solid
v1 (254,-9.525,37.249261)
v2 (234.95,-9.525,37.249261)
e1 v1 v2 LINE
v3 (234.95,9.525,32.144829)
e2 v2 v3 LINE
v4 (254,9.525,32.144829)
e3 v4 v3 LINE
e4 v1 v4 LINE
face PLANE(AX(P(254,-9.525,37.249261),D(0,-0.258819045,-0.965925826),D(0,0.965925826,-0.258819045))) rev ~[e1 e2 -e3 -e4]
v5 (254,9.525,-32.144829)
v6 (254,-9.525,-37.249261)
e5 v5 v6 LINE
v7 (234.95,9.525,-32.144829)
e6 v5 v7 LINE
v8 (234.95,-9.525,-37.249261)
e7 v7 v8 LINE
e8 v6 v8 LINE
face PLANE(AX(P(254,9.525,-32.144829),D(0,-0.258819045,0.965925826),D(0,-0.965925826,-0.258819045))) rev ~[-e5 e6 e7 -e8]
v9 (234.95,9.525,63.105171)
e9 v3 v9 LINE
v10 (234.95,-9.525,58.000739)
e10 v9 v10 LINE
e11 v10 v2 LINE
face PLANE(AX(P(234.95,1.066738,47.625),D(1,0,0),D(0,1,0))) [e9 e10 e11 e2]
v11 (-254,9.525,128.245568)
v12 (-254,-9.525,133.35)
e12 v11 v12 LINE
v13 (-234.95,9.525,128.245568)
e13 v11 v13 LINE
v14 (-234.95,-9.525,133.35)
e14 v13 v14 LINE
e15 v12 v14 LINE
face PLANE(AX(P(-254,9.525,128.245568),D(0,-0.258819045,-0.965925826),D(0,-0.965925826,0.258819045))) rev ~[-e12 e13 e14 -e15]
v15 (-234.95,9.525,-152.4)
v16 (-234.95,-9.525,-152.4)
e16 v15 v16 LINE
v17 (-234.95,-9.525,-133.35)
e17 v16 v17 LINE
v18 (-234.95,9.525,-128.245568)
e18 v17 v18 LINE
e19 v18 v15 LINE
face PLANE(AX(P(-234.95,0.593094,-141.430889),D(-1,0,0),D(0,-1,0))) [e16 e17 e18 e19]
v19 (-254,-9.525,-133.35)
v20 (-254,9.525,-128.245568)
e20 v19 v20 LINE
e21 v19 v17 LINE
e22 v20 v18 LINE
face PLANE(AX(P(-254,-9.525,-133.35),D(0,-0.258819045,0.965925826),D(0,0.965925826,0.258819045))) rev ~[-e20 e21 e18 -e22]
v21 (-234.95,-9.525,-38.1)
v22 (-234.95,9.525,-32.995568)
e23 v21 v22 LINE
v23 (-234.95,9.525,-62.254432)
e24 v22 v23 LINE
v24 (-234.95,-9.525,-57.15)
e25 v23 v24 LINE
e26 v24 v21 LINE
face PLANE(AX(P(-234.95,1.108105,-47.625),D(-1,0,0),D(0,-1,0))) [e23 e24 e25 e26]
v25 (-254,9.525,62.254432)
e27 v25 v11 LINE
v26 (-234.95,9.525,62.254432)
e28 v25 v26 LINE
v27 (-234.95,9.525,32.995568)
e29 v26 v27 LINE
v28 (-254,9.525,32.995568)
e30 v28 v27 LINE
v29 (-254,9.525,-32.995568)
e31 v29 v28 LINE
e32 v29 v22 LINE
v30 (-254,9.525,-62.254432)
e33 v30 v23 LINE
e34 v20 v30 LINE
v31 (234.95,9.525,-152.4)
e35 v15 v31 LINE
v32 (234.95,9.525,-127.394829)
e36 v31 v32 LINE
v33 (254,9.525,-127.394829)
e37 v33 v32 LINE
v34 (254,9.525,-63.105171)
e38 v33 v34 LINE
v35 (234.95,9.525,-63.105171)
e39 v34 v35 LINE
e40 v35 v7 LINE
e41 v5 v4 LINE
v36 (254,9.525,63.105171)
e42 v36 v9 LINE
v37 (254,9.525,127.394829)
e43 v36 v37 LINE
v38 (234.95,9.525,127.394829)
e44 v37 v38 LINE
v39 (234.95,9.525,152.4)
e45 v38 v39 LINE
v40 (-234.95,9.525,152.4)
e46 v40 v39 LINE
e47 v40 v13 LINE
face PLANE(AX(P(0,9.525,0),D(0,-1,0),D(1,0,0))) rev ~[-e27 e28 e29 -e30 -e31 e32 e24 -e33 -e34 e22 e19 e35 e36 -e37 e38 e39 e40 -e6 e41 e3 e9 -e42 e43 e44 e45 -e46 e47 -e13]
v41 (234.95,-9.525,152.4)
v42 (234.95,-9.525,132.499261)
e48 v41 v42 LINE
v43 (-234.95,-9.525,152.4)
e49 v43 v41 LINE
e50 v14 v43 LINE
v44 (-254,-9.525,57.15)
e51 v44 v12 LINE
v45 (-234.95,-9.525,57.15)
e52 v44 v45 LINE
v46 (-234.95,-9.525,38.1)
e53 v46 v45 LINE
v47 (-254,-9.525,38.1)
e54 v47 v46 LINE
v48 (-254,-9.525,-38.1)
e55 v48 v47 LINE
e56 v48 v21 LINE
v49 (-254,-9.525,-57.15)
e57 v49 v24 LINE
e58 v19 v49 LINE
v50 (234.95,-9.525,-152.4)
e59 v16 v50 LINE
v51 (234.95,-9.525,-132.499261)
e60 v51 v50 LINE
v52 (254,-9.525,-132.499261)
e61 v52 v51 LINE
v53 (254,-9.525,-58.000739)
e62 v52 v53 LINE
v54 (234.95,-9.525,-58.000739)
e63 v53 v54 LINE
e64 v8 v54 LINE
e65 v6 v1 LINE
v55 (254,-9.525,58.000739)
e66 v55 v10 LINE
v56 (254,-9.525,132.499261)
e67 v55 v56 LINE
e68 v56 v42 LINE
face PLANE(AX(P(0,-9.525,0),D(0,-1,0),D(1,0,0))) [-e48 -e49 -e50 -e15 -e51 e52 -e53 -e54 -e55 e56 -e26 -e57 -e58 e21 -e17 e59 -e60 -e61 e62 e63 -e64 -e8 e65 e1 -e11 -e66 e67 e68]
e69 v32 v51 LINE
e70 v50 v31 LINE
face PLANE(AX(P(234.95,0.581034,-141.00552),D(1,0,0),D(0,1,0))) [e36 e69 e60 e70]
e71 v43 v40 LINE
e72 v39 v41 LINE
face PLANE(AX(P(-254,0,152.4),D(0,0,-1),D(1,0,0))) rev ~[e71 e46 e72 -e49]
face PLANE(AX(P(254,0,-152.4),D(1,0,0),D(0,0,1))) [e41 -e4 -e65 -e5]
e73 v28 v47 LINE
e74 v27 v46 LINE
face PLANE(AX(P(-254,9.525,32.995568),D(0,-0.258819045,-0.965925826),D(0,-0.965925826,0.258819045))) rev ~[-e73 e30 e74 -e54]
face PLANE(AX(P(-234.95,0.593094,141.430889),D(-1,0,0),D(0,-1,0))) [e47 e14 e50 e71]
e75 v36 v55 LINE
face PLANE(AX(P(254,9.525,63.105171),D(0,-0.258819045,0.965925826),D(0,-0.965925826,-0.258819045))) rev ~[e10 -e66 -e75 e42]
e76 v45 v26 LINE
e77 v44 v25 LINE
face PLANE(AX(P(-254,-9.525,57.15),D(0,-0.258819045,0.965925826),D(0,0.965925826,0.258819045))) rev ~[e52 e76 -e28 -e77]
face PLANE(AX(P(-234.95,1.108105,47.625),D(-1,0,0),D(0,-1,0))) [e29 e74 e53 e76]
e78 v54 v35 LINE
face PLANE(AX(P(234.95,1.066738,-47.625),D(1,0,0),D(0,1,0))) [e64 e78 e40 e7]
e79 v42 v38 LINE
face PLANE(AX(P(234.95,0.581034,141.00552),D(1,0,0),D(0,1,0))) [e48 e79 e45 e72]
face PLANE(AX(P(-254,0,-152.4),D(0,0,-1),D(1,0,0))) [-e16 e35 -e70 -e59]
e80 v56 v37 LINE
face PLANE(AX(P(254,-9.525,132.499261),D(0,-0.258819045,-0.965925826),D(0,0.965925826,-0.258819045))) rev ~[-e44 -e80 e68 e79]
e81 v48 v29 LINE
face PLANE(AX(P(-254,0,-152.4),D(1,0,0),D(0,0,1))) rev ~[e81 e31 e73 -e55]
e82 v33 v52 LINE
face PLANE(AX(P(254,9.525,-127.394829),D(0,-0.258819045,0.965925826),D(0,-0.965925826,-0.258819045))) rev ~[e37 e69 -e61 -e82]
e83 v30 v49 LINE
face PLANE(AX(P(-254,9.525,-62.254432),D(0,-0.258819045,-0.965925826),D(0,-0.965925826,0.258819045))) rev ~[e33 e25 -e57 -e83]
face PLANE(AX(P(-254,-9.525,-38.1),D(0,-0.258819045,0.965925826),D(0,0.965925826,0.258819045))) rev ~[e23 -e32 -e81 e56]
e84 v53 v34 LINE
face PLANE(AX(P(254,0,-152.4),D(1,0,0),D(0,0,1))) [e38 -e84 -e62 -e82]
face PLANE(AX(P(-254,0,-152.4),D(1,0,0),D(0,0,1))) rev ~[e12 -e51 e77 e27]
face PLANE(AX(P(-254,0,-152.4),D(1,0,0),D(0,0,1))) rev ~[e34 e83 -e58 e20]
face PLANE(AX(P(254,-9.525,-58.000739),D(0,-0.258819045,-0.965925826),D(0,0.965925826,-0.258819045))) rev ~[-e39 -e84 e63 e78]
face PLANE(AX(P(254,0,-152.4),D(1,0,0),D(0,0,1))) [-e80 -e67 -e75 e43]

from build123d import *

# Parameters (mm, degrees)
F0_W     = 508
F0_H     = 304.8
F1_DEPTH = 9.525
F3_DEPTH = 19.05
F5_DEPTH = 19.05


# Not quite as in the source:
# - a feature names something its author has since deleted; it is built from what else it names


with BuildPart() as f1:
    # F0 (on Front) → F1 (new body, symmetric)
    with BuildSketch(Plane.XZ):
        Rectangle(F0_W, F0_H)
    extrude(amount=F1_DEPTH, both=True)

    # F2 (on face) → F3 (cut)
    with BuildSketch(Plane(origin=(-254, 0, 0), x_dir=(0, -1, 0), z_dir=(-1, 0, 0))):
        Polygon((-9.525, 128.2455678842), (9.525, 133.35), (9.525, 152.4), (-9.525, 152.4), align=None)
        Polygon((9.525, 38.1), (9.525, 57.15), (-9.525, 62.2544321158), (-9.525, 32.9955678842), align=None)
        Polygon((9.525, -57.15), (9.525, -38.1), (-9.525, -32.9955678842), (-9.525, -62.2544321158), align=None)
        Polygon((9.525, -152.4), (9.525, -133.35), (-9.525, -128.2455678842), (-9.525, -152.4), align=None)
    extrude(amount=-F3_DEPTH, mode=Mode.SUBTRACT)

    # F4 (on face) → F5 (cut)
    with BuildSketch(Plane.YZ.offset(254)):
        Polygon((-9.525, 132.499261314), (9.525, 127.3948291982), (9.525, 152.4), (-9.525, 152.4), align=None)
        Polygon((9.525, 32.1448291982), (9.525, 63.1051708018), (-9.525, 58.000738686), (-9.525, 37.249261314), align=None)
        Polygon((9.525, -63.1051708018), (9.525, -32.1448291982), (-9.525, -37.249261314), (-9.525, -58.000738686), align=None)
        Polygon((9.525, -152.4), (9.525, -127.3948291982), (-9.525, -132.499261314), (-9.525, -152.4), align=None)
    extrude(amount=-F5_DEPTH, mode=Mode.SUBTRACT)


solid = f1.part
